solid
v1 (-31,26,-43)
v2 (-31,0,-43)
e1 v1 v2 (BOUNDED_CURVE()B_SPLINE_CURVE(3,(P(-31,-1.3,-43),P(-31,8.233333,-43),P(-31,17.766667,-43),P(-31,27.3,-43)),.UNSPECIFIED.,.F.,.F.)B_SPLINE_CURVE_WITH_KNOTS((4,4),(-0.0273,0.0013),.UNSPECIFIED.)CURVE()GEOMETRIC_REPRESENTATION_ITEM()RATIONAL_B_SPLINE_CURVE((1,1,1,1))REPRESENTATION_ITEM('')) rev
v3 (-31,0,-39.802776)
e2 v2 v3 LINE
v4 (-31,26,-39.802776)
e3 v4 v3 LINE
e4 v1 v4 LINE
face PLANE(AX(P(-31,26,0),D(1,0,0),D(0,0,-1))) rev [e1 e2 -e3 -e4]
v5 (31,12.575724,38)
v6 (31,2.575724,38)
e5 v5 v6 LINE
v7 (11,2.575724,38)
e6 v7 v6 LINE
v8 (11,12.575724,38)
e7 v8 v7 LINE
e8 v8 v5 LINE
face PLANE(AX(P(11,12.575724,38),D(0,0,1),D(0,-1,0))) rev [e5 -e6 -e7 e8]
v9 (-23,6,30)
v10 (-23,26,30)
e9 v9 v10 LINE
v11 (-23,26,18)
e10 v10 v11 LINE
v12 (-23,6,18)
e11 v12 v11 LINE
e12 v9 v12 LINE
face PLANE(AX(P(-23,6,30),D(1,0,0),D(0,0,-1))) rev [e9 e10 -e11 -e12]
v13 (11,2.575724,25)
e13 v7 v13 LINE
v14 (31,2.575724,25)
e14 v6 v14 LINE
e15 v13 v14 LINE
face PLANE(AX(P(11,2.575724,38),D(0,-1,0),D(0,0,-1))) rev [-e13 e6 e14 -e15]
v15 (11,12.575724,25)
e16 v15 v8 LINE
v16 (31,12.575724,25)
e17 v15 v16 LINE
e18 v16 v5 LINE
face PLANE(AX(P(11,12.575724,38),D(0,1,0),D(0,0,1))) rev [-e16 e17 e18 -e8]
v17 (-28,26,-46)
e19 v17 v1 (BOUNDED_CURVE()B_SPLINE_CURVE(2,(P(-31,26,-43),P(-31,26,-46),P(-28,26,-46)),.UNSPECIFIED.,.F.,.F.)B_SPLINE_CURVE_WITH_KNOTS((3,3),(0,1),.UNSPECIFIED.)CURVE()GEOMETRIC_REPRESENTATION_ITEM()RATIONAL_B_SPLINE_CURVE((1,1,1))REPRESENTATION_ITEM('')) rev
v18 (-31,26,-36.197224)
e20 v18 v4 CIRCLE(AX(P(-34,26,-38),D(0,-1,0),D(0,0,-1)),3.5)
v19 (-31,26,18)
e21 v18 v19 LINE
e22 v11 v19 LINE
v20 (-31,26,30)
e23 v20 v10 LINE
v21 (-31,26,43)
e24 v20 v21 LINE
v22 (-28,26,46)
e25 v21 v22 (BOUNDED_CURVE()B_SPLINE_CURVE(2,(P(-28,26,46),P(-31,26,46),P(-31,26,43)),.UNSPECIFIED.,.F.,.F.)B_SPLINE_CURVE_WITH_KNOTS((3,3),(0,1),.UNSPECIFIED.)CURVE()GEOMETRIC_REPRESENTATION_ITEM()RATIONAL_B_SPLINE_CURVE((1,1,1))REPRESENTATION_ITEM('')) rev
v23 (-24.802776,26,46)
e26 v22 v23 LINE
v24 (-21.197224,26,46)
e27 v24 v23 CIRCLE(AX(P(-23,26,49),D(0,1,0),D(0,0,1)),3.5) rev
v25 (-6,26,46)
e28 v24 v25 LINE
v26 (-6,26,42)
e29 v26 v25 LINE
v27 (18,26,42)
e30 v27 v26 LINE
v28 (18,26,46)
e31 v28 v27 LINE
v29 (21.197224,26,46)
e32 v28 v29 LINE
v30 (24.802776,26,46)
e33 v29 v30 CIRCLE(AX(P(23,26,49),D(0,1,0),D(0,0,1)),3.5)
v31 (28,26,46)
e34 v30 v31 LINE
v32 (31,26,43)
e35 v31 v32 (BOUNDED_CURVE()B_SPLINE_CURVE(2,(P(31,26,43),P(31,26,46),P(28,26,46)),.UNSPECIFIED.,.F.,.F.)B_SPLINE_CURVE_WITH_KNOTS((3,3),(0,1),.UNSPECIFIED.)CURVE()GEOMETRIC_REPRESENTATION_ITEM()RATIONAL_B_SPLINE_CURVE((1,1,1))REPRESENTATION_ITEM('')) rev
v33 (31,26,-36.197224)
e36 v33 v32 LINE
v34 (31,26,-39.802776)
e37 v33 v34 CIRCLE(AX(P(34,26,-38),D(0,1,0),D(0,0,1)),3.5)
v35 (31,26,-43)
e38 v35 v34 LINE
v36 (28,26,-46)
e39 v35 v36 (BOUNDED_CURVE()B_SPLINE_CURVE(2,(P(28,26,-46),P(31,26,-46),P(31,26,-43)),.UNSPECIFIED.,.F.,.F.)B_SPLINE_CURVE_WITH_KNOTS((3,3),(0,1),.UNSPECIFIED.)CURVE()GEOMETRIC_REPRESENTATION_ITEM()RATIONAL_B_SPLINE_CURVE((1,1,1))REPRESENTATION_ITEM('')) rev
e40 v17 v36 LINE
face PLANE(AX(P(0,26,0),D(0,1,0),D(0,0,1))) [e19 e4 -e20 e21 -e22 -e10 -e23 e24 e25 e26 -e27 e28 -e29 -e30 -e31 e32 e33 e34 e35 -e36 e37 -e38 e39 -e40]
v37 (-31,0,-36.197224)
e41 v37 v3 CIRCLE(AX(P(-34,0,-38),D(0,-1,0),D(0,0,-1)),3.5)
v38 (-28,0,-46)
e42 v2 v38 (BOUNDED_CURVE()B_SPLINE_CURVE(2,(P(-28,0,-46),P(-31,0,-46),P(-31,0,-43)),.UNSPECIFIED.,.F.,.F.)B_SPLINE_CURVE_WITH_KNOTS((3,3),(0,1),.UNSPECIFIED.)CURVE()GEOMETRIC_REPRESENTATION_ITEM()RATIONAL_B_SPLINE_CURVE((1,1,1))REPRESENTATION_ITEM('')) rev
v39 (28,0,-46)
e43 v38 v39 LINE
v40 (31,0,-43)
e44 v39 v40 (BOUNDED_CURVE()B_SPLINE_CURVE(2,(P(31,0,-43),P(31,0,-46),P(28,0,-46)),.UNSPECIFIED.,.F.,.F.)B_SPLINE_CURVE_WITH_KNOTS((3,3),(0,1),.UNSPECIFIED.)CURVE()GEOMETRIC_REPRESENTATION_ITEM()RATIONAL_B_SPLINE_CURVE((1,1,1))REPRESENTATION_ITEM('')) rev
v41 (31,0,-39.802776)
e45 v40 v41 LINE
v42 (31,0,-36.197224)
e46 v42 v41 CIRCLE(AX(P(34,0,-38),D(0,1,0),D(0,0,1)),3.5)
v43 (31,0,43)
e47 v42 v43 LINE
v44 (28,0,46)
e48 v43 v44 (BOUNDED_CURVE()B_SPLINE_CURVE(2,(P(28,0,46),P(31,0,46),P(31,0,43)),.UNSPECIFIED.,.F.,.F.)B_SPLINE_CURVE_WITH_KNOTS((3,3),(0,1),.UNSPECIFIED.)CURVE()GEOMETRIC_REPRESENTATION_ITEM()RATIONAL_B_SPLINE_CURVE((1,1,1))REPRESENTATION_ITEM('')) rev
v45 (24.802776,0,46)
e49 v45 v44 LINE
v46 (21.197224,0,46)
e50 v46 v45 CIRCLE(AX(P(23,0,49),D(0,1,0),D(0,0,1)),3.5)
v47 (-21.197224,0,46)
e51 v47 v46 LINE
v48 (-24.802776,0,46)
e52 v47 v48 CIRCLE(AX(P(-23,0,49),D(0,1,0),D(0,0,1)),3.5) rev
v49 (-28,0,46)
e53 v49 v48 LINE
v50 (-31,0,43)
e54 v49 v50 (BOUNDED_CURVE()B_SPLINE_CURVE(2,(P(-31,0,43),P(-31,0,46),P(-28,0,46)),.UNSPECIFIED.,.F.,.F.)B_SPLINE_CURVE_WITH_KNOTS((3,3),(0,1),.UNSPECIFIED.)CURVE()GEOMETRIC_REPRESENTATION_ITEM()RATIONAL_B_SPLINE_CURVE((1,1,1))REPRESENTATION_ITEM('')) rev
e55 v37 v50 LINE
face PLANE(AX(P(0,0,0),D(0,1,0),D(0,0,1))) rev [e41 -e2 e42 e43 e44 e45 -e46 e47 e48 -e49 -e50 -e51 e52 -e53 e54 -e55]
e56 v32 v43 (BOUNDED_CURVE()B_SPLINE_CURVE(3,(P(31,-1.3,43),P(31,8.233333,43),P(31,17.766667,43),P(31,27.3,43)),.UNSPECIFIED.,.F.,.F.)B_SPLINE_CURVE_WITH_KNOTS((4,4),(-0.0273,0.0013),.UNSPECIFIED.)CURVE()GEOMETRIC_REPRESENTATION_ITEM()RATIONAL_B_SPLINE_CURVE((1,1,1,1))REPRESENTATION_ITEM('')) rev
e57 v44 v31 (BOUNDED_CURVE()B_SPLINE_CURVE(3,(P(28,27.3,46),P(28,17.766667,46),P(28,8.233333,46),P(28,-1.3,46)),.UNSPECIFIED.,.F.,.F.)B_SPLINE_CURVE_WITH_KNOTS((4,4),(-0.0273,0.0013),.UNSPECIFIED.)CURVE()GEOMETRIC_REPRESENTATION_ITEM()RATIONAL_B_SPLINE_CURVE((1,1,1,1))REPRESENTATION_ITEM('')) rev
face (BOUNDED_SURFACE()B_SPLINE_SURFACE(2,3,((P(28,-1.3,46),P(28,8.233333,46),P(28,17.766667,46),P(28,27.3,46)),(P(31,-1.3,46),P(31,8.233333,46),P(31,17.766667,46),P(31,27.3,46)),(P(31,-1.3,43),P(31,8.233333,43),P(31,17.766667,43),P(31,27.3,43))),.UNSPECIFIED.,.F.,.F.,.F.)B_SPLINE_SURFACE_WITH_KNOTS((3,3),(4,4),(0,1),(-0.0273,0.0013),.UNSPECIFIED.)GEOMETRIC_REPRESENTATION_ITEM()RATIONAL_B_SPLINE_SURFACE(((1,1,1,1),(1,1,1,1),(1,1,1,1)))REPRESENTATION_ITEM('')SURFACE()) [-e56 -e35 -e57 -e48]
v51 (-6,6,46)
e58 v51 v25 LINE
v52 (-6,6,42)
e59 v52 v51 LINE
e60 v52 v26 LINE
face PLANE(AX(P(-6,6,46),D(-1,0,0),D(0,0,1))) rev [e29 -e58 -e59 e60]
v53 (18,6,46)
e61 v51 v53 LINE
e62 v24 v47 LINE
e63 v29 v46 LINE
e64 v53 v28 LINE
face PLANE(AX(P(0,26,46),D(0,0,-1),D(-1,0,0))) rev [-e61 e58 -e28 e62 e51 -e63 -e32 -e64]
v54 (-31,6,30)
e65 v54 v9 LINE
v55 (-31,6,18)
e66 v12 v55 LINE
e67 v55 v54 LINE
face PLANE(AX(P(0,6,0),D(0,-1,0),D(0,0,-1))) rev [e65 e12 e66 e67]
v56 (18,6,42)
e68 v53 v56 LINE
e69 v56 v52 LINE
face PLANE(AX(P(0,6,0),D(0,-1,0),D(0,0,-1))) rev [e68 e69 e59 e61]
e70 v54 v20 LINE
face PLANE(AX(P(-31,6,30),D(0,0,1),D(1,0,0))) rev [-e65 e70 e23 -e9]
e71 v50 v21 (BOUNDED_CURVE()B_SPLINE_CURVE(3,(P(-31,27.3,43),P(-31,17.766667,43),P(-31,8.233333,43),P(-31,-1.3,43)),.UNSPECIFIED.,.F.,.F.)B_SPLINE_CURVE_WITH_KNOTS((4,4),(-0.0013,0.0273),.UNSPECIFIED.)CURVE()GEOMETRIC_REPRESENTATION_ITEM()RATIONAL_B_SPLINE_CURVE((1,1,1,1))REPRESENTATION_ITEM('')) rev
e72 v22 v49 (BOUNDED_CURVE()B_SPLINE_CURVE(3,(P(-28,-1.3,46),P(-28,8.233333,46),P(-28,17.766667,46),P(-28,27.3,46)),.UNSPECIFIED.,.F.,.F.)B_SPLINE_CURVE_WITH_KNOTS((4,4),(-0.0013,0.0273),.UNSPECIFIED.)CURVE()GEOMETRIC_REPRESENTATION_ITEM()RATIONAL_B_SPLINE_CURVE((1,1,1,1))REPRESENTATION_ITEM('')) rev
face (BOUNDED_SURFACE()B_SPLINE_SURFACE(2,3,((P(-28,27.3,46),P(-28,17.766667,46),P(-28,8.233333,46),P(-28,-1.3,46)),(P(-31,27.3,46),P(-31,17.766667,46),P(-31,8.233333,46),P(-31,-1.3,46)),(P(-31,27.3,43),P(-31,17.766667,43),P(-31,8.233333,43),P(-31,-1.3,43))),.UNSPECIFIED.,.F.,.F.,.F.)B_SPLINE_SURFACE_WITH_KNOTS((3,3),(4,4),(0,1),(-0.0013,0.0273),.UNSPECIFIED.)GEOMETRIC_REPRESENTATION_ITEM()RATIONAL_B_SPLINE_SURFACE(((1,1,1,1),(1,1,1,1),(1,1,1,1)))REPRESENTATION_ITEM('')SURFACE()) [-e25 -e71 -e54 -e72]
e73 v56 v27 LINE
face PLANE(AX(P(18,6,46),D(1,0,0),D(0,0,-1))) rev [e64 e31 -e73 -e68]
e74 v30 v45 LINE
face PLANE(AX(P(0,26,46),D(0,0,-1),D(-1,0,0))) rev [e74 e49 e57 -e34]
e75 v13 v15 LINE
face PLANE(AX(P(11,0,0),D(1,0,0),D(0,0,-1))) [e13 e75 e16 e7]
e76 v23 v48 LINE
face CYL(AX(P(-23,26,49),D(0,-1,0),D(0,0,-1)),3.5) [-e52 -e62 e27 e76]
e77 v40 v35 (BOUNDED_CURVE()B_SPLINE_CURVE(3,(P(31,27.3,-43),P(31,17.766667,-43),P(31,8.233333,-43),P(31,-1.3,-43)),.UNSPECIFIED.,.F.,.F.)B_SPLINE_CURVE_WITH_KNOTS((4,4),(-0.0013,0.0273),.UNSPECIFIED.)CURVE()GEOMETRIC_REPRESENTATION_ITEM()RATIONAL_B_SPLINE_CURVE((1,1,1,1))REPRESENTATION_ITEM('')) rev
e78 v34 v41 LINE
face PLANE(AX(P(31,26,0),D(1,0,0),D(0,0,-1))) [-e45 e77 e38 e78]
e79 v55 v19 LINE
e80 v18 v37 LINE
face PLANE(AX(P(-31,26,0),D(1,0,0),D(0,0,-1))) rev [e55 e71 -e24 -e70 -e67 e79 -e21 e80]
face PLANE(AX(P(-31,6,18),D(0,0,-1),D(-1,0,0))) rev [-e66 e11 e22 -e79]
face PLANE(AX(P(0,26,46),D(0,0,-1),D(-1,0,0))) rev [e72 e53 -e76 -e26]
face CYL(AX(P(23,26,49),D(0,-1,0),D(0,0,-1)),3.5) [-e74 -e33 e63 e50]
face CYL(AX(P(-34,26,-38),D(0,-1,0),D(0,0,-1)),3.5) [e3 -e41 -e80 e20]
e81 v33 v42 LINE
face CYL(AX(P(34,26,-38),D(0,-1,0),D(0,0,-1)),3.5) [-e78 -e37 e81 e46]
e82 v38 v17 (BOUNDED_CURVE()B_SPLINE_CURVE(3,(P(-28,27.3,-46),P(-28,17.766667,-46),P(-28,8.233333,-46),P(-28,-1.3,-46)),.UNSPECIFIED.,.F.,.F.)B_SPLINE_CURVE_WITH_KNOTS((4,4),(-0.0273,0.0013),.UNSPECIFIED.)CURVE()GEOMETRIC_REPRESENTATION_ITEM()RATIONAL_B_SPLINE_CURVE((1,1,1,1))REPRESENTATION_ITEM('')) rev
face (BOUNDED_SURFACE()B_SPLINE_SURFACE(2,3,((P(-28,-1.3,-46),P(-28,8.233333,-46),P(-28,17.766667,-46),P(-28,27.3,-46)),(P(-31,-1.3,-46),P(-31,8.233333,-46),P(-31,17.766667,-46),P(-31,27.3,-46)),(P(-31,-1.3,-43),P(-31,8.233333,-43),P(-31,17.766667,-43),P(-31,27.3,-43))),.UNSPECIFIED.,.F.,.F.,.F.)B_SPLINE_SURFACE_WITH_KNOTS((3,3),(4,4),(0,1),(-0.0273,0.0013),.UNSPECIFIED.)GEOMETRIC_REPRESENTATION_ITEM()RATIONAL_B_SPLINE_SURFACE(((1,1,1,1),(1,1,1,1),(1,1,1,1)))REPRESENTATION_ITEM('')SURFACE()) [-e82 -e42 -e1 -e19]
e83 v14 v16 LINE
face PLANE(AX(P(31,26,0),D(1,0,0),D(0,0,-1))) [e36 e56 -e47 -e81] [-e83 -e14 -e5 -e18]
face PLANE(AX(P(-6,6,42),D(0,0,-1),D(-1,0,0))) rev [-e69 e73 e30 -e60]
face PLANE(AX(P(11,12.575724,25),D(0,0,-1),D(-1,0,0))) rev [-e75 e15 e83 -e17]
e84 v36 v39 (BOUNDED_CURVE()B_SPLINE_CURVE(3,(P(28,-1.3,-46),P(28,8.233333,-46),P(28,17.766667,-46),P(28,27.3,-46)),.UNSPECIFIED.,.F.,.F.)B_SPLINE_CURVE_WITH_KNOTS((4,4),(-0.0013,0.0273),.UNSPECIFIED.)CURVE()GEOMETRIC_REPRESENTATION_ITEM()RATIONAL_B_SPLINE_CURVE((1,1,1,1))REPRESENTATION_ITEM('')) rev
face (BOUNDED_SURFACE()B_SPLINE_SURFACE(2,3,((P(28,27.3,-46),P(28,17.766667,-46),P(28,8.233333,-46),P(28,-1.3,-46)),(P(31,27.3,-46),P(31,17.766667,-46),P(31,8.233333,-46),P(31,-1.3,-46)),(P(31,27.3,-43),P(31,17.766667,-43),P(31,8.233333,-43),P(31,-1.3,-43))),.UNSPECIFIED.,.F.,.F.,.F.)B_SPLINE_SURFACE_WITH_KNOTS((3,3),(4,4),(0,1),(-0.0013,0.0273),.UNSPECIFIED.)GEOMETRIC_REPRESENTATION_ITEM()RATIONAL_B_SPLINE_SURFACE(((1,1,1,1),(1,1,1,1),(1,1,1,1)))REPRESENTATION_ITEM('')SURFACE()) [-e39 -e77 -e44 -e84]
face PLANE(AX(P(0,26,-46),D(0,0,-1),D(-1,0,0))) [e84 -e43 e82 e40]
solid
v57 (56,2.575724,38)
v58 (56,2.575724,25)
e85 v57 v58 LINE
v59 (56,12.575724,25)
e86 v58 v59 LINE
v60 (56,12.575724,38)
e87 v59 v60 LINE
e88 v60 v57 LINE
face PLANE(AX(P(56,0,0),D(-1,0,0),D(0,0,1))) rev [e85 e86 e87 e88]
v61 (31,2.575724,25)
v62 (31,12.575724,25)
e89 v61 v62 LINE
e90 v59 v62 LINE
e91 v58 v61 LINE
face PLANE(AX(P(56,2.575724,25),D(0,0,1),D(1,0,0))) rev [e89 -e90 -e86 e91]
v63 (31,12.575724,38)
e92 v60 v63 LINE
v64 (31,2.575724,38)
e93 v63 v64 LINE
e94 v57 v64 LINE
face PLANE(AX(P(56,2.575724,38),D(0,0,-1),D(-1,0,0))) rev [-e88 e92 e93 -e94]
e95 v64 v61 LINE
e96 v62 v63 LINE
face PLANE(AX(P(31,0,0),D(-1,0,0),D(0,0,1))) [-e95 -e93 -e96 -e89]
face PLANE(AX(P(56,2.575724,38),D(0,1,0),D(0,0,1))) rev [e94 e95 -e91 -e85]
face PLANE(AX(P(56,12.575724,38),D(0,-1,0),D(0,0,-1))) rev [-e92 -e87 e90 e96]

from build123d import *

# Parameters (mm, degrees)
CROQUIS1_R              = 3.5
CROQUIS1_W              = 62
CROQUIS1_H              = 92
SALIENTE_EXTRUIR1_DEPTH = 26
REDONDEO1_SIZE          = 3
CROQUIS2_W              = 13
CROQUIS2_H              = 10
CORTAR_EXTRUIR1_DEPTH   = 20
CROQUIS3_W              = 8
CROQUIS3_H              = 12
CORTAR_EXTRUIR2_DEPTH   = 20
CROQUIS4_W              = 24
CROQUIS4_H              = 4
CORTAR_EXTRUIR3_DEPTH   = 20
CROQUIS5_W              = 13
CROQUIS5_H              = 10
SALIENTE_EXTRUIR2_DEPTH = 25


with BuildPart() as part:
    # Croquis1 → Saliente-Extruir1 (new body)
    with BuildSketch(Plane(origin=(0, 0, 0), x_dir=(1, 0, 0), z_dir=(0, 1, 0))):
        with Locations((-23, -49)):
            Circle(CROQUIS1_R)
        with Locations((23, -49)):
            Circle(CROQUIS1_R)
        with Locations((34, 38)):
            Circle(CROQUIS1_R)
        with Locations((-34, 38)):
            Circle(CROQUIS1_R)
        Rectangle(CROQUIS1_W, CROQUIS1_H)
        with BuildLine():
            ThreePointArc((-21.197224362, -46), (-23, -45.5), (-24.802775638, -46))
            Line((-24.802775638, -46), (-21.197224362, -46))
        make_face()
        with BuildLine():
            Line((-21.197224362, -46), (-24.802775638, -46))
            ThreePointArc((-24.802775638, -46), (-24.723410176, -52.046285831), (-19.5, -49))
            ThreePointArc((-19.5, -49), (-19.953714169, -47.276589824), (-21.197224362, -46))
        make_face()
    extrude(amount=SALIENTE_EXTRUIR1_DEPTH)

    # Redondeo1
    # a fillet whose section is not a circle: 3 mm, written as the material it takes off along each edge
    with BuildSketch(Plane(origin=(31, -7.5, 46), x_dir=(-1, 0, 0), z_dir=(0, 1, 0)), Plane(origin=(-31, -7.5, 46), x_dir=(0, 0, -1), z_dir=(0, 1, 0)), Plane(origin=(-31, -7.5, -46), x_dir=(1, 0, 0), z_dir=(0, 1, 0)), Plane(origin=(31, -7.5, -46), x_dir=(0, 0, 1), z_dir=(0, 1, 0))) as redondeo1_piece_1:
        with BuildLine():
            Bezier((REDONDEO1_SIZE, 0), (0, 0), (0, -REDONDEO1_SIZE), weights=[1, 1, 1])
            Line((0, -REDONDEO1_SIZE), (0, 0))
            Line((0, 0), (REDONDEO1_SIZE, 0))
        make_face()
    extrude(amount=41, mode=Mode.SUBTRACT)

    # Croquis2 → Cortar-Extruir1 (cut)
    with BuildSketch(Plane(origin=(31, 0, 0), x_dir=(0, 0, -1), z_dir=(1, 0, 0))):
        with Locations((-31.5, 7.575724176)):
            Rectangle(CROQUIS2_W, CROQUIS2_H)
    extrude(amount=-CORTAR_EXTRUIR1_DEPTH, mode=Mode.SUBTRACT)

    # Croquis3 → Cortar-Extruir2 (cut)
    with BuildSketch(Plane(origin=(0, 26, 0), x_dir=(1, 0, 0), z_dir=(0, 1, 0))):
        with Locations((-27, -24)):
            Rectangle(CROQUIS3_W, CROQUIS3_H)
    extrude(amount=-CORTAR_EXTRUIR2_DEPTH, mode=Mode.SUBTRACT)

    # Croquis4 → Cortar-Extruir3 (cut)
    with BuildSketch(Plane(origin=(0, 26, 0), x_dir=(1, 0, 0), z_dir=(0, 1, 0))):
        with Locations((6, -44)):
            Rectangle(CROQUIS4_W, CROQUIS4_H)
    extrude(amount=-CORTAR_EXTRUIR3_DEPTH, mode=Mode.SUBTRACT)


with BuildPart() as body_2:
    # Croquis5 → Saliente-Extruir2 (new body)
    with BuildSketch(Plane(origin=(31, 0, 0), x_dir=(0, 0, -1), z_dir=(1, 0, 0))):
        with Locations((-31.5, 7.575724176)):
            Rectangle(CROQUIS5_W, CROQUIS5_H)
    extrude(amount=SALIENTE_EXTRUIR2_DEPTH)


solid = Compound([part.part, body_2.part])
